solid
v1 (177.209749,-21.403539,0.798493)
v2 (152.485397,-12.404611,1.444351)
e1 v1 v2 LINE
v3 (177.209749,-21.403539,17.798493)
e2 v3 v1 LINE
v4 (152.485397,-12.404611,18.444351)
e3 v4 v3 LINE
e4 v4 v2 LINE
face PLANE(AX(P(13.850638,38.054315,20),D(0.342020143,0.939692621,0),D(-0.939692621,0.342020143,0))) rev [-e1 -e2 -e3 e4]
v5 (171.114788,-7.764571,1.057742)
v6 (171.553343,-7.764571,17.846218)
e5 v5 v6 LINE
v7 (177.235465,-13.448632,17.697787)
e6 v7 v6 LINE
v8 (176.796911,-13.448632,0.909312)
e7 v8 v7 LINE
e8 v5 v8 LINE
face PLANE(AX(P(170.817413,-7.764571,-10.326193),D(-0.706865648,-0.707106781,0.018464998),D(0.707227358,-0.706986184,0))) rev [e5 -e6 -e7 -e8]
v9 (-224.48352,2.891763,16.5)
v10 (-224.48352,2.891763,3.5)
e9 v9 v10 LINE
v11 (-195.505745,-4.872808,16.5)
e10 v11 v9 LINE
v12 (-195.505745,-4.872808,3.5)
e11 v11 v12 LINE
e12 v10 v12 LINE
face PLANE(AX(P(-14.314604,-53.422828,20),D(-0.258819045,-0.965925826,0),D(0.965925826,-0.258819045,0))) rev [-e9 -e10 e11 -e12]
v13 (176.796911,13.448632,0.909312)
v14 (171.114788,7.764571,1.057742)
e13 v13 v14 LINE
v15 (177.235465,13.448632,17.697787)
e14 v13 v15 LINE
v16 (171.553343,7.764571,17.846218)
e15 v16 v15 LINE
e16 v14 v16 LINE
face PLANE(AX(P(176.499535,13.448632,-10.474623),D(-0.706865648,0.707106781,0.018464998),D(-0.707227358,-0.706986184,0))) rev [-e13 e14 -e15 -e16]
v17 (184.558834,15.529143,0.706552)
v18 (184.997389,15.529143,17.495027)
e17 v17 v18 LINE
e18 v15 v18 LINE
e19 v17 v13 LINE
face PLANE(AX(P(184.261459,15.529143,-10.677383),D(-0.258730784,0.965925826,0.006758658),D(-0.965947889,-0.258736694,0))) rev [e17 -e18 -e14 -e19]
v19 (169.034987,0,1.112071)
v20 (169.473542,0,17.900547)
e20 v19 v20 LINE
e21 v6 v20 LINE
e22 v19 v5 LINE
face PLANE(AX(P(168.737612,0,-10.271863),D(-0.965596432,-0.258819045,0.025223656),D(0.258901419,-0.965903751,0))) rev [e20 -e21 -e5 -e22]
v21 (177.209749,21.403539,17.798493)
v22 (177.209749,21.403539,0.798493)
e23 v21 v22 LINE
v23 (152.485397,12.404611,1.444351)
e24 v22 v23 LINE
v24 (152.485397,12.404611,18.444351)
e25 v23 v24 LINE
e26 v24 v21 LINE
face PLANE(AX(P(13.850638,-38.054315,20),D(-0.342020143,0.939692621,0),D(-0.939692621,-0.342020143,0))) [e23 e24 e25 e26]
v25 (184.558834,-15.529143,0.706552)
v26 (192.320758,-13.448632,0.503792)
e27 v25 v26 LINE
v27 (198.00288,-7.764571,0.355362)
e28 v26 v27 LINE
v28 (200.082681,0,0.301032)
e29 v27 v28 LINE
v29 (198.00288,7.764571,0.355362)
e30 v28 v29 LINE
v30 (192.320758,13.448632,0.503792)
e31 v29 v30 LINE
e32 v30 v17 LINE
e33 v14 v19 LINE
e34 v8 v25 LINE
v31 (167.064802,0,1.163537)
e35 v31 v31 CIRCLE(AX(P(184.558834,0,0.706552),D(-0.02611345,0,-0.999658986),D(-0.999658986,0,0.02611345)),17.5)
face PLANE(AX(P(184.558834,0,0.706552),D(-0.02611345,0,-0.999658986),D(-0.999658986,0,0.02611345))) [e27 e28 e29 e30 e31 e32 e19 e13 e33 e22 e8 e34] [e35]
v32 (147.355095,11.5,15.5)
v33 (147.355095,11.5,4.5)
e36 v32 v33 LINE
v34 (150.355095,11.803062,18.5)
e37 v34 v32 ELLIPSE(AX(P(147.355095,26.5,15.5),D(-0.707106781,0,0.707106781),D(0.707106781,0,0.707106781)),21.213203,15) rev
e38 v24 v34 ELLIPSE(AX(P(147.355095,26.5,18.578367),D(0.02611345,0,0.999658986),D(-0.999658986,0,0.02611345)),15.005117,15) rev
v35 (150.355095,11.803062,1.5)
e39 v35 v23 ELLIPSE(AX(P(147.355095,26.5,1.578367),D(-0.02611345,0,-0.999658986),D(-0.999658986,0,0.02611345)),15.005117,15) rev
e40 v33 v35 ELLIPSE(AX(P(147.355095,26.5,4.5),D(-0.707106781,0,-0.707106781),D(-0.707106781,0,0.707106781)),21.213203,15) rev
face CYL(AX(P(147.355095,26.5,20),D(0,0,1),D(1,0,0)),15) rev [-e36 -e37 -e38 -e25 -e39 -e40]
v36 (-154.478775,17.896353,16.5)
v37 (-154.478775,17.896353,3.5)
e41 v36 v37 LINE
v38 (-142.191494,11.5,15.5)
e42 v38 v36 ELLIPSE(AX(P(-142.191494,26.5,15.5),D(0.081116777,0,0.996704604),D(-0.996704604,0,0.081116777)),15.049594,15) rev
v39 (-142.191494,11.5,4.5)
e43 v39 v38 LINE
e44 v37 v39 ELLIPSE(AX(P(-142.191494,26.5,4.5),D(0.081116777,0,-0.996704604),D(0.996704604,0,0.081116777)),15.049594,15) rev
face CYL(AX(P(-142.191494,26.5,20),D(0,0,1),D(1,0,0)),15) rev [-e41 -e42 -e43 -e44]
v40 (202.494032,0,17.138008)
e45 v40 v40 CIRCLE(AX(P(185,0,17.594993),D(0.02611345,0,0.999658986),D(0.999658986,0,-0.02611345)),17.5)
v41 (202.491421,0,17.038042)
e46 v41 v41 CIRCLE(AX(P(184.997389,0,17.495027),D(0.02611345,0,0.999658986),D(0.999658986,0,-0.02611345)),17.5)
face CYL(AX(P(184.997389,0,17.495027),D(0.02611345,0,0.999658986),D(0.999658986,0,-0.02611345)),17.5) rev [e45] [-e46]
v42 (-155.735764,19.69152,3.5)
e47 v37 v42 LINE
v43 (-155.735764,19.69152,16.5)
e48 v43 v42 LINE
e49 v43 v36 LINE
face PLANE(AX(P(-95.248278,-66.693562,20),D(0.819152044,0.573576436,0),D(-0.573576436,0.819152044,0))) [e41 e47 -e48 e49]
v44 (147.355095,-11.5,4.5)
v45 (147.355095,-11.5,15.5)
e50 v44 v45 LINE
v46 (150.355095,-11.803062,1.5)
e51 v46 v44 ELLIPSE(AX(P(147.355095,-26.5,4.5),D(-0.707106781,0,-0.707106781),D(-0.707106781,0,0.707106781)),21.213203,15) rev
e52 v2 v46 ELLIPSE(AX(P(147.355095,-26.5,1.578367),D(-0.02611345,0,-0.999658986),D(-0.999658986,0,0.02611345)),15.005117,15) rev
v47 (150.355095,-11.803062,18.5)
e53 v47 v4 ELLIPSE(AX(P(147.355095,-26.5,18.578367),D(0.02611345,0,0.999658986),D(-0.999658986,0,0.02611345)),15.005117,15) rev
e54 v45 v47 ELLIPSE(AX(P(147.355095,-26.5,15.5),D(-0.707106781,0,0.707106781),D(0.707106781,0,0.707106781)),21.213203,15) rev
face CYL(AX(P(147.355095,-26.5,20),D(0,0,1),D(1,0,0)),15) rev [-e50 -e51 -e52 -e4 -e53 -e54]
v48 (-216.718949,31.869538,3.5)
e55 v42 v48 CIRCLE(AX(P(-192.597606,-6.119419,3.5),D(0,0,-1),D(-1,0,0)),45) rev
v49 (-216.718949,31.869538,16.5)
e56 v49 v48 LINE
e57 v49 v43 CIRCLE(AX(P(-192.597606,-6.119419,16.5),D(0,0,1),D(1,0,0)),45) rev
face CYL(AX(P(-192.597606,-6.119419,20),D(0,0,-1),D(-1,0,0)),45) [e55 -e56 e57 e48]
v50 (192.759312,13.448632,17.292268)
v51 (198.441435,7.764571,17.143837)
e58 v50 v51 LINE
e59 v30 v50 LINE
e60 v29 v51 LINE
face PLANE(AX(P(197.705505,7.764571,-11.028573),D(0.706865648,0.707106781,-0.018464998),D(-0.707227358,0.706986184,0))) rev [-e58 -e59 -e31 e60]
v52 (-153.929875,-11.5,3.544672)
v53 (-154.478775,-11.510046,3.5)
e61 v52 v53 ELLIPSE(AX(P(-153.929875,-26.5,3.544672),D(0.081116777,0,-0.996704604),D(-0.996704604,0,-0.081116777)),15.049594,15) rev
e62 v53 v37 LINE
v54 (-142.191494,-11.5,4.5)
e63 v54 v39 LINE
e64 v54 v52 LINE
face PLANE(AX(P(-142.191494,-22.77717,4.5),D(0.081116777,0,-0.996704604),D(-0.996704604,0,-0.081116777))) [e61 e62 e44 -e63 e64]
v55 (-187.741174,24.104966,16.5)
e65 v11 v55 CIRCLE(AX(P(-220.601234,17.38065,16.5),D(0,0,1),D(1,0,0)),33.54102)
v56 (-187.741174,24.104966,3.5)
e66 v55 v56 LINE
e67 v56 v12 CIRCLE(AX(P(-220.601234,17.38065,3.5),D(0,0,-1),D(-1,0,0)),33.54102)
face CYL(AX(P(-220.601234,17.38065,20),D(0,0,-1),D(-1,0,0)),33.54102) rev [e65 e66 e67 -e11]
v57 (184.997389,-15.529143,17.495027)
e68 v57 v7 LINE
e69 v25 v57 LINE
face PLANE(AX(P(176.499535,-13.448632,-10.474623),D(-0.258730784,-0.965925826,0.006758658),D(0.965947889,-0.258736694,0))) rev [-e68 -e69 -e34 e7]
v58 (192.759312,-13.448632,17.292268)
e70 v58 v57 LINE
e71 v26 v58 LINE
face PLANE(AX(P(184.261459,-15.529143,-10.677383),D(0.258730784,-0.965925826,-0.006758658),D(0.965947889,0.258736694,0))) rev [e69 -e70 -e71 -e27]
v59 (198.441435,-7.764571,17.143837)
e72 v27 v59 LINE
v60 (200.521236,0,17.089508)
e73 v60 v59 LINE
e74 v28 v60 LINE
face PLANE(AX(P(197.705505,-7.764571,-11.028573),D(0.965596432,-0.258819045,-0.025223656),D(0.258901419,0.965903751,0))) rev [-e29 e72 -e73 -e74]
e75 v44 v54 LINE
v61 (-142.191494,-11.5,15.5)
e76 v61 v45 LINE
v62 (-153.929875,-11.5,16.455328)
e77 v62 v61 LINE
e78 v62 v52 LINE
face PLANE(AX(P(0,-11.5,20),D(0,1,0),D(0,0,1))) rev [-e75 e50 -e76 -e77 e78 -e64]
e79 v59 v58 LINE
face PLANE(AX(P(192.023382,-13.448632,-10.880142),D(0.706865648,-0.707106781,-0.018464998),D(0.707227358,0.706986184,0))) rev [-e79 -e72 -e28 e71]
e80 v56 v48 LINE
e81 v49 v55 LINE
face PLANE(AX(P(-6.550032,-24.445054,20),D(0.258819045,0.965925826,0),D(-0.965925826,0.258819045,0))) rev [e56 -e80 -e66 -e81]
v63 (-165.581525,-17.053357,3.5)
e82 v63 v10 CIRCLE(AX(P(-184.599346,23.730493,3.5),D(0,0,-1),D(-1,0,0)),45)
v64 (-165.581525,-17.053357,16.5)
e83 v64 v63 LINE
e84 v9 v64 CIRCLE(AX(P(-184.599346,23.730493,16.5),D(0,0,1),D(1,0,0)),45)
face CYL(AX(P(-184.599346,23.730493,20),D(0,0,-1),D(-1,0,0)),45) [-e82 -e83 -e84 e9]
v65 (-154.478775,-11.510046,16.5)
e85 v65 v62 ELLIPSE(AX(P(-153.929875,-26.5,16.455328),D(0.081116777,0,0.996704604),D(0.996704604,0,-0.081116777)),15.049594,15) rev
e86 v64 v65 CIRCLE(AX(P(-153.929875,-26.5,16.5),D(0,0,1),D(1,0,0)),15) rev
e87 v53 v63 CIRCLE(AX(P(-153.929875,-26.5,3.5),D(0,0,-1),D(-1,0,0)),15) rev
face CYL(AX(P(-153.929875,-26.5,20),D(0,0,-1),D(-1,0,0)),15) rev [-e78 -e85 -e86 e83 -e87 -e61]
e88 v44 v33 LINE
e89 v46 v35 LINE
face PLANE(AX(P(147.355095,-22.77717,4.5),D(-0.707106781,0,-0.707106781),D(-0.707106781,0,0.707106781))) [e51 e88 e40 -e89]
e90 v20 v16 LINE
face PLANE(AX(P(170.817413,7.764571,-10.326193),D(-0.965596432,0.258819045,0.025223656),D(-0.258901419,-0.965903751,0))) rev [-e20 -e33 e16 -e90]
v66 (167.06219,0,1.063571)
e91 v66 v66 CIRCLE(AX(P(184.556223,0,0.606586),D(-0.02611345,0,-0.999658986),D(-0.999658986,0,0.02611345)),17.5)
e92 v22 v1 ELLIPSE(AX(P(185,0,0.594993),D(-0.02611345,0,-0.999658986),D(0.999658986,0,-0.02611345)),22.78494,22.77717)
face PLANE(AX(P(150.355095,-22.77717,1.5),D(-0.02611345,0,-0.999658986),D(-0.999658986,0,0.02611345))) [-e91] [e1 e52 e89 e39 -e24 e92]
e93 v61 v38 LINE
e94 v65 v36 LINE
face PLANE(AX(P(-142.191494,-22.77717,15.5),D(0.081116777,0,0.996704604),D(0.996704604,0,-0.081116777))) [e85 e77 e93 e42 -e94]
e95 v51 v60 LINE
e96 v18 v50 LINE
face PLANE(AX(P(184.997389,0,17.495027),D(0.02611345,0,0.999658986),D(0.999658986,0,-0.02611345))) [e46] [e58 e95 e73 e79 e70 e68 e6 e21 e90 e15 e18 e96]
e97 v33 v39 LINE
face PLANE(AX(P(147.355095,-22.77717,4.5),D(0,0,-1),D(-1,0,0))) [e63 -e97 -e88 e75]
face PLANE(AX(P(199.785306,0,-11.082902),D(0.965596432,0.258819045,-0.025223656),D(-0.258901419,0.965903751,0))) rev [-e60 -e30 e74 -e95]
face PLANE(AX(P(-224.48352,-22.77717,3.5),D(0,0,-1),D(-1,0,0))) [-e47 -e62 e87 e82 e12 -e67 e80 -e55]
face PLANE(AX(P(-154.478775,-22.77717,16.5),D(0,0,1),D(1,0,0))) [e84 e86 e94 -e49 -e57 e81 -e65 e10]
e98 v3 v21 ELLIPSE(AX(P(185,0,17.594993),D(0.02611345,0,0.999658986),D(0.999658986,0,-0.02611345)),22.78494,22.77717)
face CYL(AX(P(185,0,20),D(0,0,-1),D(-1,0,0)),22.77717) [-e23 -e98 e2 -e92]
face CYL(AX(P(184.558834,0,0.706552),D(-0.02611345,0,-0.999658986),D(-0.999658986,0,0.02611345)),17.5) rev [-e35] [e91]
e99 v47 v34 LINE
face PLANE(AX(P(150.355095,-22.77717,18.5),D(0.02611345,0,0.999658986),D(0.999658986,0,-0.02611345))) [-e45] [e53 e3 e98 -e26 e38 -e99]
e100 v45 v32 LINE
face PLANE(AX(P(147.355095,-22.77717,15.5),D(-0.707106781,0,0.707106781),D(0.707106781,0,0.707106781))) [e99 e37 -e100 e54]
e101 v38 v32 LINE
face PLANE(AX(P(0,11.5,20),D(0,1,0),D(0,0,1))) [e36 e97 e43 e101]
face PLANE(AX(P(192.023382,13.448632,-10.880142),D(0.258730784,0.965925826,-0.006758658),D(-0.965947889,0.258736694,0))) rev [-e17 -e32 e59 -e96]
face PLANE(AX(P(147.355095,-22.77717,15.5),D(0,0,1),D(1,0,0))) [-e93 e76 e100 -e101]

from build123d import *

# Parameters (mm, degrees)
AUFSATZ_LINEAR_AUSTRAGEN2_DEPTH      = 20
VERRUNDUNG1_R                        = 15
SCHNITT_LINEAR_AUSTRAGEN3_DEPTH      = 229.701880893
SCHNITT_LINEAR_AUSTRAGEN3_DEPTH_BACK = 229.701880893
SKIZZE5_OUTSIDE_W                    = 521.679
SKIZZE5_OUTSIDE_H                    = 109.418
SCHNITT_LINEAR_AUSTRAGEN6_DEPTH      = 228.676613663
SKIZZE7_R                            = 17.5
SCHNITT_LINEAR_AUSTRAGEN5_DEPTH      = 0.1
SCHNITT_LINEAR_START                 = -0.1
SKIZZE9_R                            = 17.5
SCHNITT_LINEAR_AUSTRAGEN7_DEPTH      = 0.1
VERRUNDUNG5_R                        = 15


with BuildPart() as part:
    # Skizze1 → Aufsatz-Linear austragen2 (new body)
    with BuildSketch(Plane.XY):
        with BuildLine():
            Line((-216.718948666, 31.869537692), (-187.741173877, 24.104966339))
            ThreePointArc((-187.741173877, 24.104966339), (-188.20309721, 8.699595617), (-195.50574523, -4.87280845))
            Line((-195.50574523, -4.87280845), (-224.483520019, 2.891762903))
            ThreePointArc((-224.483520019, 2.891762903), (-199.032056143, -18.892233896), (-165.581524585, -17.053356943))
            Line((-165.581524585, -17.053356943), (-161.471528727, -11.5))
            Line((-161.471528727, -11.5), (150, -11.5))
            Line((150, -11.5), (177.209748999, -21.403538717))
            ThreePointArc((177.209748999, -21.403538717), (207.777170155, 0), (177.209748999, 21.403538717))
            Line((177.209748999, 21.403538717), (150, 11.5))
            Line((150, 11.5), (-150, 11.5))
            Line((-150, 11.5), (-155.735764364, 19.691520443))
            ThreePointArc((-155.735764364, 19.691520443), (-183.785335986, 38.009300378), (-216.718948666, 31.869537692))
        make_face()
    extrude(amount=AUFSATZ_LINEAR_AUSTRAGEN2_DEPTH)

    # Verrundung1
    verrundung1_edges = [part.edges().sort_by_distance(p)[0] for p in [
        (-150, 11.5, 10),
        (150, 11.5, 10),
        (150, -11.5, 10),
    ]]
    fillet(verrundung1_edges, radius=VERRUNDUNG1_R)

    # Skizze5 outside → Schnitt-Linear austragen3 (cut, two sides: drawn at the far end of the back side and taken through both)
    with BuildSketch(Plane(origin=(0, 0, 0), x_dir=(1, 0, 0), z_dir=(0, 1, 0)).offset(-SCHNITT_LINEAR_AUSTRAGEN3_DEPTH_BACK)):
        with Locations((-8.3535, -10)):
            Rectangle(SKIZZE5_OUTSIDE_W, SKIZZE5_OUTSIDE_H)
        Polygon((147.355095289, -15.5), (150.355095289, -18.5), (207.777170155, -17), (207.777170155, 0), (150.355095289, -1.5), (147.355095289, -4.5), (-142.191494242, -4.5), (-154.478774906, -3.5), (-224.483520019, -3.5), (-224.483520019, -16.5), (-154.478774906, -16.5), (-142.191494242, -15.5), align=None, mode=Mode.SUBTRACT)
    extrude(amount=SCHNITT_LINEAR_AUSTRAGEN3_DEPTH + SCHNITT_LINEAR_AUSTRAGEN3_DEPTH_BACK, mode=Mode.SUBTRACT)

    # Skizze8 → Schnitt-Linear austragen6 (cut, through all)
    with BuildSketch(Plane(origin=(-1.278585019, 0, 22.46102929), x_dir=(0.9996589857202393, 0, -0.026113449959408383), z_dir=(0.026113449959408383, 0, 0.9996589857202393))):
        Polygon((201.871273052, 0), (199.790762428, 7.764571353), (194.106701699, 13.448632083), (186.342130346, 15.529142706), (178.577558993, 13.448632083), (172.893498263, 7.764571353), (170.81298764, 0), (172.893498263, -7.764571353), (178.577558993, -13.448632083), (186.342130346, -15.529142706), (194.106701699, -13.448632083), (199.790762428, -7.764571353), align=None)
    extrude(amount=-SCHNITT_LINEAR_AUSTRAGEN6_DEPTH, mode=Mode.SUBTRACT)

    # Skizze7 → Schnitt-Linear austragen5 (cut)
    with BuildSketch(Plane(origin=(-0.373956847, 0, 5.437398269), x_dir=(-0.9996589857202394, 0, 0.026113449959408383), z_dir=(-0.026113449959408383, 0, -0.9996589857202394))):
        with Locations((-184.993264929, 0)):
            Circle(SKIZZE7_R)
    extrude(amount=-SCHNITT_LINEAR_AUSTRAGEN5_DEPTH, mode=Mode.SUBTRACT)

    # Skizze9 → Schnitt-Linear austragen7 (cut)
    with BuildSketch(Plane(origin=(0.585463065, 0, 22.412335959), x_dir=(0.9996589857202393, 0, -0.026113449959408383), z_dir=(0.026113449959408383, 0, 0.9996589857202393)).offset(SCHNITT_LINEAR_START)):
        with Locations(Location((184.477446379, 0, 0), (0, 0, 180))):
            Circle(SKIZZE9_R)
    extrude(amount=SCHNITT_LINEAR_AUSTRAGEN7_DEPTH, mode=Mode.SUBTRACT)

    # Verrundung5
    # the kernel refuses this fillet: 15 mm, written as the material it adds along each edge
    with BuildSketch(Plane(origin=(-161.471528727, -11.5, 3.5), x_dir=(1, 0, 0), z_dir=(0, 0, 1))) as verrundung5_piece_1_section:
        with BuildLine():
            CenterArc((7.541653594, -15), VERRUNDUNG5_R, 90, 50.96638681)
            Line((-4.109995858, -5.553356943), (-4.343028847, -5.364424082))
            ThreePointArc((-4.343028847, -5.364424082), (-2.296139873, -2.598211212), (-0.241141944, 0.178467259))
            Line((-0.241141944, 0.178467259), (0, 0.3))
            Line((0, 0.3), (7.541653594, 0.3))
            Line((7.541653594, 0.3), (7.541653594, 0))
        make_face()
    verrundung5_piece_1 = extrude(amount=13, mode=Mode.PRIVATE)
    verrundung5_piece_1 = split(verrundung5_piece_1, bisect_by=Plane(origin=(-154.879802837, -11.415872576, 16.532637647), z_dir=(-0.08111677690648599, 0, -0.9967046044361908)), keep=Keep.TOP, mode=Mode.PRIVATE)
    verrundung5_piece_1 = split(verrundung5_piece_1, bisect_by=Plane(origin=(-154.879802837, -11.415872576, 3.467362353), z_dir=(-0.08111677690648603, 0, 0.9967046044361908)), keep=Keep.TOP, mode=Mode.PRIVATE)
    add(verrundung5_piece_1)


solid = part.part
